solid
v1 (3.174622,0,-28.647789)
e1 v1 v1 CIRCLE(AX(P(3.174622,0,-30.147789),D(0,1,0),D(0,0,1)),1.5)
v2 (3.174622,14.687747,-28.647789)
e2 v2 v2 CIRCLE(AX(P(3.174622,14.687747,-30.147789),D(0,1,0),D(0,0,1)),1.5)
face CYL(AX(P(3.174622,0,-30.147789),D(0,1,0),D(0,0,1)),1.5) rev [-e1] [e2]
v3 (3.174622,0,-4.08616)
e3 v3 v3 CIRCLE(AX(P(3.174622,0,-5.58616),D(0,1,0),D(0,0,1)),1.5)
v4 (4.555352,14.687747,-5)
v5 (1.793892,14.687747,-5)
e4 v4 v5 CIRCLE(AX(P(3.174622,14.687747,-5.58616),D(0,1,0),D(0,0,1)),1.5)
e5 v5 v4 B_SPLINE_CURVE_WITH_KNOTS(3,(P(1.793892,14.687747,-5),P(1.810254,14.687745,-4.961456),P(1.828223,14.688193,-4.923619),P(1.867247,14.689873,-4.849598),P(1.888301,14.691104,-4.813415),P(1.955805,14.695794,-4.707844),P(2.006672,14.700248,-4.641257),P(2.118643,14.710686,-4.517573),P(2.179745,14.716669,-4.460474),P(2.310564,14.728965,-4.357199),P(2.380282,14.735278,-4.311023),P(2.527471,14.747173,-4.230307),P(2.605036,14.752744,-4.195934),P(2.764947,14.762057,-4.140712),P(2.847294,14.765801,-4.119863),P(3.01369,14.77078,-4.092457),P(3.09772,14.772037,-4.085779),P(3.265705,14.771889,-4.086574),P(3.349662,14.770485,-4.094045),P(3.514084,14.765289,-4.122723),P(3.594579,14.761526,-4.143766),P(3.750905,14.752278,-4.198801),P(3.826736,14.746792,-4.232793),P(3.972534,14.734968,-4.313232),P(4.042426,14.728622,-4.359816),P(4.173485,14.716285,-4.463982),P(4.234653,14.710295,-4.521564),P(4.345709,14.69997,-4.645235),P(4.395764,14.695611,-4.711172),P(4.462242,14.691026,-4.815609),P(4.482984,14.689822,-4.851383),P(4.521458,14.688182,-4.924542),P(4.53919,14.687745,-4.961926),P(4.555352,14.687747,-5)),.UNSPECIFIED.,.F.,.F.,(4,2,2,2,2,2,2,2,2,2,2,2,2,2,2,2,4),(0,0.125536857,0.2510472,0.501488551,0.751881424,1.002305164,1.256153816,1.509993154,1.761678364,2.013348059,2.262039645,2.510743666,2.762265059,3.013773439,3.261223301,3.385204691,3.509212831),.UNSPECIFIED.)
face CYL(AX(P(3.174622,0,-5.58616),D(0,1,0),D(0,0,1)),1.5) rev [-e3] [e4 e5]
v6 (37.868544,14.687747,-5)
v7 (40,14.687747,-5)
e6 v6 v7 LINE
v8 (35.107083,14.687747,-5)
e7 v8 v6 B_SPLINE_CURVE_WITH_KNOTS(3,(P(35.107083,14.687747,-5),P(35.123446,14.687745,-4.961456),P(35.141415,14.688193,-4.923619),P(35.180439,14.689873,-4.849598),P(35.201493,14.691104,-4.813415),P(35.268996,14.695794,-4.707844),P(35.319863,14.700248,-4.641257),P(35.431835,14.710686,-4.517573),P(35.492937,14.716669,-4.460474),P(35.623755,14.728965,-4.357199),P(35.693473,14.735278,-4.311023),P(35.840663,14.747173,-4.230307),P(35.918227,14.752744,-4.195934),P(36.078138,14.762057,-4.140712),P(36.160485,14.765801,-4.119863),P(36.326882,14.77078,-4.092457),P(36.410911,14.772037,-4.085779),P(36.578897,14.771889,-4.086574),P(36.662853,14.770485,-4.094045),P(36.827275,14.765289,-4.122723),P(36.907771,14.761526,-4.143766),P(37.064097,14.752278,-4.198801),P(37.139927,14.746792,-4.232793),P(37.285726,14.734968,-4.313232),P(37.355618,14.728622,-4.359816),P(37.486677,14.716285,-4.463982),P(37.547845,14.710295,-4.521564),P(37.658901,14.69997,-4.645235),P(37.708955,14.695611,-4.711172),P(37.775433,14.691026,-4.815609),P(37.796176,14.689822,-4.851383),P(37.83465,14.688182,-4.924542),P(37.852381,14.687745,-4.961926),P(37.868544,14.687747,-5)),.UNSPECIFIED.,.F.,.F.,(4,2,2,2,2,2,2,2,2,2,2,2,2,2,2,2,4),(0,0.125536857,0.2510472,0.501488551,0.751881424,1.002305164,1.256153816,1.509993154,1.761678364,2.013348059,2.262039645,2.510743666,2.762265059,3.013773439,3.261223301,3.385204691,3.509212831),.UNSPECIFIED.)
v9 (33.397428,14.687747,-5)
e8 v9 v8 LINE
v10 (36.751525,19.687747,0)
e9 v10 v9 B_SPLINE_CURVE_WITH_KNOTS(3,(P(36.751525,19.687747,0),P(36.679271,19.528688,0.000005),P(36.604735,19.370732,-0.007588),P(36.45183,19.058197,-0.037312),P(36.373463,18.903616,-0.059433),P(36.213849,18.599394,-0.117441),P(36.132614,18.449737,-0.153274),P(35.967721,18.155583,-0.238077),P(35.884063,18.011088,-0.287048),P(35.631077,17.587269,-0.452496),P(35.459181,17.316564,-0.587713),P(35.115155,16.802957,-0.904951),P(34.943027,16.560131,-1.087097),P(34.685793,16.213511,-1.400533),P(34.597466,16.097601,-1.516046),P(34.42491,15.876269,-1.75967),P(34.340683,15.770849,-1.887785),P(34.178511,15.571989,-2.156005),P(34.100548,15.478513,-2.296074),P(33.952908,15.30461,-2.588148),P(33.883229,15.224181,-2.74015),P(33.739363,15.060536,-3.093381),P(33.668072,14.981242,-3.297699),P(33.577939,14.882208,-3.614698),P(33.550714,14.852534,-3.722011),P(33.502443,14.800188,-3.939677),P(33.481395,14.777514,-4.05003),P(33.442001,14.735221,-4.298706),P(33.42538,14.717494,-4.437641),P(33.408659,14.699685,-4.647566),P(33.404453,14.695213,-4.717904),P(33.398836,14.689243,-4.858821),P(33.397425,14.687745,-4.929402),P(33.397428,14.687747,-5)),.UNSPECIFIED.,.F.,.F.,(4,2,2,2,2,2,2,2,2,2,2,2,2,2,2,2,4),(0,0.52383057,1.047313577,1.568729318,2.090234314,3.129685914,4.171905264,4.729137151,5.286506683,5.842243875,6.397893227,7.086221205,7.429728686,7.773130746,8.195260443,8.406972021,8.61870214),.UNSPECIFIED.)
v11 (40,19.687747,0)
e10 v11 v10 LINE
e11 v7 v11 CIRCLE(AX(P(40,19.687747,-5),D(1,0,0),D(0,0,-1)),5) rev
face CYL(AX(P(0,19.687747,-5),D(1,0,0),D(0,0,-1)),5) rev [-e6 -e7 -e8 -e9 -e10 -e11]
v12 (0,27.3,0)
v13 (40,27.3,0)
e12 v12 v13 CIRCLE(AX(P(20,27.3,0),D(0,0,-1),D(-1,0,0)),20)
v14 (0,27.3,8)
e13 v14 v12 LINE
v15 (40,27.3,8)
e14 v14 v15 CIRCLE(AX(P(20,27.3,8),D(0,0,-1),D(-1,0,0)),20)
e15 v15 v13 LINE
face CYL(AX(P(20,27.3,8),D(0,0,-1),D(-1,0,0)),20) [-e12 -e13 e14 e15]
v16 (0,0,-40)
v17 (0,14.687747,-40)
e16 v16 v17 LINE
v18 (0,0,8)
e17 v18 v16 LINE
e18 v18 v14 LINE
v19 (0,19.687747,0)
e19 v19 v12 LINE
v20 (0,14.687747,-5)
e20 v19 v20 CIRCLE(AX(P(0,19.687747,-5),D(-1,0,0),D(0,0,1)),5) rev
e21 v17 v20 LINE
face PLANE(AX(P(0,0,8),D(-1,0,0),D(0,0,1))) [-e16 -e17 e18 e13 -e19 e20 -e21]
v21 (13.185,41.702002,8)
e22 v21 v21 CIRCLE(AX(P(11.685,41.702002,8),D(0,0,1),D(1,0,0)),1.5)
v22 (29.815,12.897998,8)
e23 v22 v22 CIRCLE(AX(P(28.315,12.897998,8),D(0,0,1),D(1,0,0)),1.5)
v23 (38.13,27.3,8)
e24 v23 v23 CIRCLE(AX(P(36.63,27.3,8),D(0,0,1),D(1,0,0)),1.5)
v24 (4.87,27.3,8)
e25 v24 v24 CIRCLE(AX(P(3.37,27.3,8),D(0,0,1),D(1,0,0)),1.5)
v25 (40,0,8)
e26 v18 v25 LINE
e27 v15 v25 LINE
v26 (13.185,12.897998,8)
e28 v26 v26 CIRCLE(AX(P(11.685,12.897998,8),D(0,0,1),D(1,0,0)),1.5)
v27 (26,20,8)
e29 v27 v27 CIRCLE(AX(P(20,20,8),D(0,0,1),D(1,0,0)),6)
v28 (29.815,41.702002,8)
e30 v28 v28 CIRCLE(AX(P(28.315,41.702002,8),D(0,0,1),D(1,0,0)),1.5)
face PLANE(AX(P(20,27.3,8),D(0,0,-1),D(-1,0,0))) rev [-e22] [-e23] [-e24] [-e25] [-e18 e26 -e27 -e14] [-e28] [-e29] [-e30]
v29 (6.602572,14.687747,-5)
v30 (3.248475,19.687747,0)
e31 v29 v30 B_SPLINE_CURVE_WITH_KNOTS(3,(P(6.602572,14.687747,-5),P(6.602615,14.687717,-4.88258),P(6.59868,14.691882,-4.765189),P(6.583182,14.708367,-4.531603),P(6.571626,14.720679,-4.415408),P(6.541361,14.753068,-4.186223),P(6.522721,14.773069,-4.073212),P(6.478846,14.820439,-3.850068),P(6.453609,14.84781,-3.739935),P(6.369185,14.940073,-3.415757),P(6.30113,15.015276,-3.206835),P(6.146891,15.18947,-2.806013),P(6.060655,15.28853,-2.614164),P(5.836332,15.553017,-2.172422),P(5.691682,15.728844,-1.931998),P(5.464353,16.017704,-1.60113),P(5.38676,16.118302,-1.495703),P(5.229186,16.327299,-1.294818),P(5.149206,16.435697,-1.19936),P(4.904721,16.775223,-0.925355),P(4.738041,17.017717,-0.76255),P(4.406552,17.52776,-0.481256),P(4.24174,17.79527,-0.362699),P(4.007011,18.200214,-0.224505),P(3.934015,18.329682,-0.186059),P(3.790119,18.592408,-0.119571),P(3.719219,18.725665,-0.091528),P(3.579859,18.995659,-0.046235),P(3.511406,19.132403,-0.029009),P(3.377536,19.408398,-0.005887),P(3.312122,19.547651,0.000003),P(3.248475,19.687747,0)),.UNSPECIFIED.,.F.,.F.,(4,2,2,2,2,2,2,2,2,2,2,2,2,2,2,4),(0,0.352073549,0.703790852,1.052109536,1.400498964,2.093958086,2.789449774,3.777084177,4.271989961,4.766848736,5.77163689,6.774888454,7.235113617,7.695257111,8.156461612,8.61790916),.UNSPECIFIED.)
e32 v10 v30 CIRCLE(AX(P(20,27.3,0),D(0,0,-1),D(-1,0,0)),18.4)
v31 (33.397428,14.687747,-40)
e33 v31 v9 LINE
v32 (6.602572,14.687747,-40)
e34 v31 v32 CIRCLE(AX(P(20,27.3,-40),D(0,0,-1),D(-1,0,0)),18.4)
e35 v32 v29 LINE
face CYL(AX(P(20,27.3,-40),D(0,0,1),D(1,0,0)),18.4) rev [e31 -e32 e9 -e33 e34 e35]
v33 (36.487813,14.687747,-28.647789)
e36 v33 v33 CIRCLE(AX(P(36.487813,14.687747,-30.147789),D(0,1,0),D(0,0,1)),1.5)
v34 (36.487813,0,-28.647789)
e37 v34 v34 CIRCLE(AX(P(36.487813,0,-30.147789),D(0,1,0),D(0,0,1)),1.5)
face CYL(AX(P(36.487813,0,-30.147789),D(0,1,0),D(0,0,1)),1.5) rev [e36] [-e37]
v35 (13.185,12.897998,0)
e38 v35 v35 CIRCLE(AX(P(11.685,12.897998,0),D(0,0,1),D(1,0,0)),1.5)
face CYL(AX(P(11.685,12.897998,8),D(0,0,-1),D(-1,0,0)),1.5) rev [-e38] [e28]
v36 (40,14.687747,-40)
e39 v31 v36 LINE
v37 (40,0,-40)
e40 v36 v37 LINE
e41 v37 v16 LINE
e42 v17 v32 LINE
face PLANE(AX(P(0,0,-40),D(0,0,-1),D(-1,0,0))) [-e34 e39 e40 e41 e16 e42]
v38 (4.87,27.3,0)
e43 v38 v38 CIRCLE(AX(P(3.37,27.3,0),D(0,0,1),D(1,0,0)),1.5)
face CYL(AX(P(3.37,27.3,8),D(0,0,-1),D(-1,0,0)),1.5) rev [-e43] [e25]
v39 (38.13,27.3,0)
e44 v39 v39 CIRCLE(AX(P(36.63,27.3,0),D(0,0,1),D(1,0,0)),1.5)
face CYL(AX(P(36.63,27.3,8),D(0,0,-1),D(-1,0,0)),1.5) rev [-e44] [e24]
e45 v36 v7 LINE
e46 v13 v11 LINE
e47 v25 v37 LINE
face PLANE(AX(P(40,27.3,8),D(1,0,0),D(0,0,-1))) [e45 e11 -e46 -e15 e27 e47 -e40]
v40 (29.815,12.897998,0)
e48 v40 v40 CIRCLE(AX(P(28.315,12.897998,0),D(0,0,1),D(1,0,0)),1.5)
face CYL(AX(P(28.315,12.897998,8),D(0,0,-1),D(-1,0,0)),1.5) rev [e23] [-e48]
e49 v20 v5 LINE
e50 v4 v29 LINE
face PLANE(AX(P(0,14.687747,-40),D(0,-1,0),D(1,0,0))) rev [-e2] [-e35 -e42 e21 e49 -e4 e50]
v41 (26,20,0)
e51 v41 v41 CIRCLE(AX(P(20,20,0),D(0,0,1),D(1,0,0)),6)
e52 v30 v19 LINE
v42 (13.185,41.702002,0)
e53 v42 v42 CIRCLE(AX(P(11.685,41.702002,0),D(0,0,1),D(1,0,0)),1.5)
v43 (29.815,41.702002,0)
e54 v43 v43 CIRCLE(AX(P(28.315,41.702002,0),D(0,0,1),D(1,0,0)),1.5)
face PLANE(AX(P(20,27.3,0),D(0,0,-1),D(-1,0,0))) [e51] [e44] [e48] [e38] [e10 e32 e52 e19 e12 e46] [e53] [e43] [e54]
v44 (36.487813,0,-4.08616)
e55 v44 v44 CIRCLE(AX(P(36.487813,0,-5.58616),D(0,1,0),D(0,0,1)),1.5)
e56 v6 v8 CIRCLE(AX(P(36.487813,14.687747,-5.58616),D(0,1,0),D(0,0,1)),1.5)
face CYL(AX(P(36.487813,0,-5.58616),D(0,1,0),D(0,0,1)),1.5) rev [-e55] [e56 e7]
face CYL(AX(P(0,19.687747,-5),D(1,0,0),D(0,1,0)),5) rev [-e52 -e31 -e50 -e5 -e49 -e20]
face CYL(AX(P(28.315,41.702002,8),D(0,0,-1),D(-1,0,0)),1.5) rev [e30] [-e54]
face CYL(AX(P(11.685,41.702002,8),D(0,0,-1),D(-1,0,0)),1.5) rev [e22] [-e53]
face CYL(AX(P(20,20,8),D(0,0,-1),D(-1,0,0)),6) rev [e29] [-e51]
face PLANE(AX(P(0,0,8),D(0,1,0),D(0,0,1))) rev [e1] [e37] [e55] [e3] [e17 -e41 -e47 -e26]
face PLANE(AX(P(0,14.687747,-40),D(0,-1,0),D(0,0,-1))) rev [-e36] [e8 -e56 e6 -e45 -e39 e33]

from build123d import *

# Parameters (mm, degrees)
EXTRUDE_2_DEPTH         = 8
SKETCH_1_11_OUTSIDE_W   = 54.492
SKETCH_1_11_OUTSIDE_H   = 61.792
SKETCH_1_11_OUTSIDE_R   = 6
SKETCH_1_11_OUTSIDE_R_2 = 1.5
CUT_EXTRUDE_2_DEPTH     = 63.460307396
EXTRUDE_4_DEPTH         = 40
SKETCH_9_R              = 1.5
CUT_EXTRUDE_3_DEPTH     = 66.295934524
FILLET_1_R              = 5
FILLET_2_R              = 5


with BuildPart() as part:
    # Эскиз1 → Бобышка-Вытянуть2 (new body)
    with BuildSketch(Plane.XY):
        with BuildLine():
            Line((0, 0), (40, 0))
            Line((40, 0), (40, 27.3))
            ThreePointArc((40, 27.3), (20, 47.3), (0, 27.3))
            Line((0, 27.3), (0, 0))
        make_face()
    extrude(amount=EXTRUDE_2_DEPTH)

    # Эскиз1<11> outside → Вырез-Вытянуть2 (cut, through all)
    # profile 1 of 8: a face of its own
    with BuildSketch(Plane.XY):
        with Locations((20, 23.65)):
            Rectangle(SKETCH_1_11_OUTSIDE_W, SKETCH_1_11_OUTSIDE_H)
        with BuildLine():
            Line((0, 0), (40, 0))
            Line((40, 0), (40, 27.3))
            ThreePointArc((40, 27.3), (20, 47.3), (0, 27.3))
            Line((0, 27.3), (0, 0))
        make_face(mode=Mode.SUBTRACT)
    # profile 2 of 8: a face of its own
    with BuildSketch(Plane.XY):
        with Locations((20, 20)):
            Circle(SKETCH_1_11_OUTSIDE_R)
    # profile 3 of 8: a face of its own
    with BuildSketch(Plane.XY):
        with Locations((3.37, 27.3)):
            Circle(SKETCH_1_11_OUTSIDE_R_2)
    # profile 4 of 8: a face of its own
    with BuildSketch(Plane.XY):
        with Locations((11.685, 41.702002465)):
            Circle(SKETCH_1_11_OUTSIDE_R_2)
    # profile 5 of 8: a face of its own
    with BuildSketch(Plane.XY):
        with Locations((28.315, 41.702002465)):
            Circle(SKETCH_1_11_OUTSIDE_R_2)
    # profile 6 of 8: a face of its own
    with BuildSketch(Plane.XY):
        with Locations((36.63, 27.3)):
            Circle(SKETCH_1_11_OUTSIDE_R_2)
    # profile 7 of 8: a face of its own
    with BuildSketch(Plane.XY):
        with Locations((28.315, 12.897997535)):
            Circle(SKETCH_1_11_OUTSIDE_R_2)
    # profile 8 of 8: a face of its own
    with BuildSketch(Plane.XY):
        with Locations((11.685, 12.897997535)):
            Circle(SKETCH_1_11_OUTSIDE_R_2)
    extrude(amount=CUT_EXTRUDE_2_DEPTH, mode=Mode.SUBTRACT)

    # Эскиз8 → Бобышка-Вытянуть4 (add)
    with BuildSketch(Plane(origin=(0, 0, 0), x_dir=(-1, 0, 0), z_dir=(0, 0, -1))):
        with BuildLine():
            Line((-33.397427614, 14.687746699), (-40, 14.687746699))
            Line((-40, 14.687746699), (-40, 0))
            Line((-40, 0), (0, 0))
            Line((0, 0), (0, 14.687746699))
            Line((0, 14.687746699), (-6.602572386, 14.687746699))
            ThreePointArc((-6.602572386, 14.687746699), (-20, 8.9), (-33.397427614, 14.687746699))
        make_face()
    extrude(amount=EXTRUDE_4_DEPTH)

    # Эскиз9 → Вырез-Вытянуть3 (cut, through all)
    with BuildSketch(Plane(origin=(0, 14.687746699, 0), x_dir=(1, 0, 0), z_dir=(0, 1, 0))):
        with Locations(Location((36.487813402, 5.586160045, 0), (0, 0, 270))):
            Circle(SKETCH_9_R)
        with Locations(Location((3.174622012, 5.586160045, 0), (0, 0, 270))):
            Circle(SKETCH_9_R)
        with Locations(Location((3.174622012, 30.147789022, 0), (0, 0, 270))):
            Circle(SKETCH_9_R)
        with Locations(Location((36.487813402, 30.147789022, 0), (0, 0, 270))):
            Circle(SKETCH_9_R)
    extrude(amount=-CUT_EXTRUDE_3_DEPTH, mode=Mode.SUBTRACT)

    # Скругление1
    # the kernel refuses this fillet: 5 mm, written as the material it adds along each edge
    with BuildSketch(Plane(origin=(20.897427614, 14.687746699, 0), x_dir=(0, 1, 0), z_dir=(1, 0, 0))) as fillet_1_piece_1_section:
        with BuildLine():
            CenterArc((FILLET_1_R, -FILLET_1_R), FILLET_1_R, 90, 90)
            Line((0, -FILLET_1_R), (0, 0))
            Line((0, 0), (FILLET_1_R, 0))
        make_face()
    fillet_1_piece_1 = extrude(amount=19.102572386, mode=Mode.PRIVATE)
    fillet_1_piece_1 = fillet_1_piece_1 - Plane(origin=(20, 27.3, -1.204390543), x_dir=(-0.7281210659848666, -0.6854485489583165, 0), z_dir=(0, 0, 1)) * Cylinder(18.4, 59, mode=Mode.PRIVATE)
    fillet_1_piece_1 = fillet_1_piece_1 - Plane(origin=(36.487813402, 15.674506784, -5.586160045), x_dir=(0, 0, 1), z_dir=(0, 1, 0)) * Cylinder(1.5, 59, mode=Mode.PRIVATE)
    add(fillet_1_piece_1)

    # Скругление2
    # the kernel refuses this fillet: 5 mm, written as the material it adds along each edge
    with BuildSketch(Plane(origin=(0, 14.687746699, 0), x_dir=(0, 0, -1), z_dir=(1, 0, 0))) as fillet_2_piece_1_section:
        with BuildLine():
            CenterArc((FILLET_2_R, FILLET_2_R), FILLET_2_R, 180, 90)
            Line((0, FILLET_2_R), (0, 0))
            Line((0, 0), (FILLET_2_R, 0))
        make_face()
    fillet_2_piece_1 = extrude(amount=19.102572386, mode=Mode.PRIVATE)
    fillet_2_piece_1 = fillet_2_piece_1 - Plane(origin=(20, 27.3, -1.204389903), x_dir=(-0.7281210659850873, -0.6854485489580822, 0), z_dir=(0, 0, 1)) * Cylinder(18.4, 59, mode=Mode.PRIVATE)
    fillet_2_piece_1 = fillet_2_piece_1 - Plane(origin=(3.174622012, 15.67450541, -5.586160045), x_dir=(0, 0, 1), z_dir=(0, 1, 0)) * Cylinder(1.5, 59, mode=Mode.PRIVATE)
    add(fillet_2_piece_1)


solid = part.part
